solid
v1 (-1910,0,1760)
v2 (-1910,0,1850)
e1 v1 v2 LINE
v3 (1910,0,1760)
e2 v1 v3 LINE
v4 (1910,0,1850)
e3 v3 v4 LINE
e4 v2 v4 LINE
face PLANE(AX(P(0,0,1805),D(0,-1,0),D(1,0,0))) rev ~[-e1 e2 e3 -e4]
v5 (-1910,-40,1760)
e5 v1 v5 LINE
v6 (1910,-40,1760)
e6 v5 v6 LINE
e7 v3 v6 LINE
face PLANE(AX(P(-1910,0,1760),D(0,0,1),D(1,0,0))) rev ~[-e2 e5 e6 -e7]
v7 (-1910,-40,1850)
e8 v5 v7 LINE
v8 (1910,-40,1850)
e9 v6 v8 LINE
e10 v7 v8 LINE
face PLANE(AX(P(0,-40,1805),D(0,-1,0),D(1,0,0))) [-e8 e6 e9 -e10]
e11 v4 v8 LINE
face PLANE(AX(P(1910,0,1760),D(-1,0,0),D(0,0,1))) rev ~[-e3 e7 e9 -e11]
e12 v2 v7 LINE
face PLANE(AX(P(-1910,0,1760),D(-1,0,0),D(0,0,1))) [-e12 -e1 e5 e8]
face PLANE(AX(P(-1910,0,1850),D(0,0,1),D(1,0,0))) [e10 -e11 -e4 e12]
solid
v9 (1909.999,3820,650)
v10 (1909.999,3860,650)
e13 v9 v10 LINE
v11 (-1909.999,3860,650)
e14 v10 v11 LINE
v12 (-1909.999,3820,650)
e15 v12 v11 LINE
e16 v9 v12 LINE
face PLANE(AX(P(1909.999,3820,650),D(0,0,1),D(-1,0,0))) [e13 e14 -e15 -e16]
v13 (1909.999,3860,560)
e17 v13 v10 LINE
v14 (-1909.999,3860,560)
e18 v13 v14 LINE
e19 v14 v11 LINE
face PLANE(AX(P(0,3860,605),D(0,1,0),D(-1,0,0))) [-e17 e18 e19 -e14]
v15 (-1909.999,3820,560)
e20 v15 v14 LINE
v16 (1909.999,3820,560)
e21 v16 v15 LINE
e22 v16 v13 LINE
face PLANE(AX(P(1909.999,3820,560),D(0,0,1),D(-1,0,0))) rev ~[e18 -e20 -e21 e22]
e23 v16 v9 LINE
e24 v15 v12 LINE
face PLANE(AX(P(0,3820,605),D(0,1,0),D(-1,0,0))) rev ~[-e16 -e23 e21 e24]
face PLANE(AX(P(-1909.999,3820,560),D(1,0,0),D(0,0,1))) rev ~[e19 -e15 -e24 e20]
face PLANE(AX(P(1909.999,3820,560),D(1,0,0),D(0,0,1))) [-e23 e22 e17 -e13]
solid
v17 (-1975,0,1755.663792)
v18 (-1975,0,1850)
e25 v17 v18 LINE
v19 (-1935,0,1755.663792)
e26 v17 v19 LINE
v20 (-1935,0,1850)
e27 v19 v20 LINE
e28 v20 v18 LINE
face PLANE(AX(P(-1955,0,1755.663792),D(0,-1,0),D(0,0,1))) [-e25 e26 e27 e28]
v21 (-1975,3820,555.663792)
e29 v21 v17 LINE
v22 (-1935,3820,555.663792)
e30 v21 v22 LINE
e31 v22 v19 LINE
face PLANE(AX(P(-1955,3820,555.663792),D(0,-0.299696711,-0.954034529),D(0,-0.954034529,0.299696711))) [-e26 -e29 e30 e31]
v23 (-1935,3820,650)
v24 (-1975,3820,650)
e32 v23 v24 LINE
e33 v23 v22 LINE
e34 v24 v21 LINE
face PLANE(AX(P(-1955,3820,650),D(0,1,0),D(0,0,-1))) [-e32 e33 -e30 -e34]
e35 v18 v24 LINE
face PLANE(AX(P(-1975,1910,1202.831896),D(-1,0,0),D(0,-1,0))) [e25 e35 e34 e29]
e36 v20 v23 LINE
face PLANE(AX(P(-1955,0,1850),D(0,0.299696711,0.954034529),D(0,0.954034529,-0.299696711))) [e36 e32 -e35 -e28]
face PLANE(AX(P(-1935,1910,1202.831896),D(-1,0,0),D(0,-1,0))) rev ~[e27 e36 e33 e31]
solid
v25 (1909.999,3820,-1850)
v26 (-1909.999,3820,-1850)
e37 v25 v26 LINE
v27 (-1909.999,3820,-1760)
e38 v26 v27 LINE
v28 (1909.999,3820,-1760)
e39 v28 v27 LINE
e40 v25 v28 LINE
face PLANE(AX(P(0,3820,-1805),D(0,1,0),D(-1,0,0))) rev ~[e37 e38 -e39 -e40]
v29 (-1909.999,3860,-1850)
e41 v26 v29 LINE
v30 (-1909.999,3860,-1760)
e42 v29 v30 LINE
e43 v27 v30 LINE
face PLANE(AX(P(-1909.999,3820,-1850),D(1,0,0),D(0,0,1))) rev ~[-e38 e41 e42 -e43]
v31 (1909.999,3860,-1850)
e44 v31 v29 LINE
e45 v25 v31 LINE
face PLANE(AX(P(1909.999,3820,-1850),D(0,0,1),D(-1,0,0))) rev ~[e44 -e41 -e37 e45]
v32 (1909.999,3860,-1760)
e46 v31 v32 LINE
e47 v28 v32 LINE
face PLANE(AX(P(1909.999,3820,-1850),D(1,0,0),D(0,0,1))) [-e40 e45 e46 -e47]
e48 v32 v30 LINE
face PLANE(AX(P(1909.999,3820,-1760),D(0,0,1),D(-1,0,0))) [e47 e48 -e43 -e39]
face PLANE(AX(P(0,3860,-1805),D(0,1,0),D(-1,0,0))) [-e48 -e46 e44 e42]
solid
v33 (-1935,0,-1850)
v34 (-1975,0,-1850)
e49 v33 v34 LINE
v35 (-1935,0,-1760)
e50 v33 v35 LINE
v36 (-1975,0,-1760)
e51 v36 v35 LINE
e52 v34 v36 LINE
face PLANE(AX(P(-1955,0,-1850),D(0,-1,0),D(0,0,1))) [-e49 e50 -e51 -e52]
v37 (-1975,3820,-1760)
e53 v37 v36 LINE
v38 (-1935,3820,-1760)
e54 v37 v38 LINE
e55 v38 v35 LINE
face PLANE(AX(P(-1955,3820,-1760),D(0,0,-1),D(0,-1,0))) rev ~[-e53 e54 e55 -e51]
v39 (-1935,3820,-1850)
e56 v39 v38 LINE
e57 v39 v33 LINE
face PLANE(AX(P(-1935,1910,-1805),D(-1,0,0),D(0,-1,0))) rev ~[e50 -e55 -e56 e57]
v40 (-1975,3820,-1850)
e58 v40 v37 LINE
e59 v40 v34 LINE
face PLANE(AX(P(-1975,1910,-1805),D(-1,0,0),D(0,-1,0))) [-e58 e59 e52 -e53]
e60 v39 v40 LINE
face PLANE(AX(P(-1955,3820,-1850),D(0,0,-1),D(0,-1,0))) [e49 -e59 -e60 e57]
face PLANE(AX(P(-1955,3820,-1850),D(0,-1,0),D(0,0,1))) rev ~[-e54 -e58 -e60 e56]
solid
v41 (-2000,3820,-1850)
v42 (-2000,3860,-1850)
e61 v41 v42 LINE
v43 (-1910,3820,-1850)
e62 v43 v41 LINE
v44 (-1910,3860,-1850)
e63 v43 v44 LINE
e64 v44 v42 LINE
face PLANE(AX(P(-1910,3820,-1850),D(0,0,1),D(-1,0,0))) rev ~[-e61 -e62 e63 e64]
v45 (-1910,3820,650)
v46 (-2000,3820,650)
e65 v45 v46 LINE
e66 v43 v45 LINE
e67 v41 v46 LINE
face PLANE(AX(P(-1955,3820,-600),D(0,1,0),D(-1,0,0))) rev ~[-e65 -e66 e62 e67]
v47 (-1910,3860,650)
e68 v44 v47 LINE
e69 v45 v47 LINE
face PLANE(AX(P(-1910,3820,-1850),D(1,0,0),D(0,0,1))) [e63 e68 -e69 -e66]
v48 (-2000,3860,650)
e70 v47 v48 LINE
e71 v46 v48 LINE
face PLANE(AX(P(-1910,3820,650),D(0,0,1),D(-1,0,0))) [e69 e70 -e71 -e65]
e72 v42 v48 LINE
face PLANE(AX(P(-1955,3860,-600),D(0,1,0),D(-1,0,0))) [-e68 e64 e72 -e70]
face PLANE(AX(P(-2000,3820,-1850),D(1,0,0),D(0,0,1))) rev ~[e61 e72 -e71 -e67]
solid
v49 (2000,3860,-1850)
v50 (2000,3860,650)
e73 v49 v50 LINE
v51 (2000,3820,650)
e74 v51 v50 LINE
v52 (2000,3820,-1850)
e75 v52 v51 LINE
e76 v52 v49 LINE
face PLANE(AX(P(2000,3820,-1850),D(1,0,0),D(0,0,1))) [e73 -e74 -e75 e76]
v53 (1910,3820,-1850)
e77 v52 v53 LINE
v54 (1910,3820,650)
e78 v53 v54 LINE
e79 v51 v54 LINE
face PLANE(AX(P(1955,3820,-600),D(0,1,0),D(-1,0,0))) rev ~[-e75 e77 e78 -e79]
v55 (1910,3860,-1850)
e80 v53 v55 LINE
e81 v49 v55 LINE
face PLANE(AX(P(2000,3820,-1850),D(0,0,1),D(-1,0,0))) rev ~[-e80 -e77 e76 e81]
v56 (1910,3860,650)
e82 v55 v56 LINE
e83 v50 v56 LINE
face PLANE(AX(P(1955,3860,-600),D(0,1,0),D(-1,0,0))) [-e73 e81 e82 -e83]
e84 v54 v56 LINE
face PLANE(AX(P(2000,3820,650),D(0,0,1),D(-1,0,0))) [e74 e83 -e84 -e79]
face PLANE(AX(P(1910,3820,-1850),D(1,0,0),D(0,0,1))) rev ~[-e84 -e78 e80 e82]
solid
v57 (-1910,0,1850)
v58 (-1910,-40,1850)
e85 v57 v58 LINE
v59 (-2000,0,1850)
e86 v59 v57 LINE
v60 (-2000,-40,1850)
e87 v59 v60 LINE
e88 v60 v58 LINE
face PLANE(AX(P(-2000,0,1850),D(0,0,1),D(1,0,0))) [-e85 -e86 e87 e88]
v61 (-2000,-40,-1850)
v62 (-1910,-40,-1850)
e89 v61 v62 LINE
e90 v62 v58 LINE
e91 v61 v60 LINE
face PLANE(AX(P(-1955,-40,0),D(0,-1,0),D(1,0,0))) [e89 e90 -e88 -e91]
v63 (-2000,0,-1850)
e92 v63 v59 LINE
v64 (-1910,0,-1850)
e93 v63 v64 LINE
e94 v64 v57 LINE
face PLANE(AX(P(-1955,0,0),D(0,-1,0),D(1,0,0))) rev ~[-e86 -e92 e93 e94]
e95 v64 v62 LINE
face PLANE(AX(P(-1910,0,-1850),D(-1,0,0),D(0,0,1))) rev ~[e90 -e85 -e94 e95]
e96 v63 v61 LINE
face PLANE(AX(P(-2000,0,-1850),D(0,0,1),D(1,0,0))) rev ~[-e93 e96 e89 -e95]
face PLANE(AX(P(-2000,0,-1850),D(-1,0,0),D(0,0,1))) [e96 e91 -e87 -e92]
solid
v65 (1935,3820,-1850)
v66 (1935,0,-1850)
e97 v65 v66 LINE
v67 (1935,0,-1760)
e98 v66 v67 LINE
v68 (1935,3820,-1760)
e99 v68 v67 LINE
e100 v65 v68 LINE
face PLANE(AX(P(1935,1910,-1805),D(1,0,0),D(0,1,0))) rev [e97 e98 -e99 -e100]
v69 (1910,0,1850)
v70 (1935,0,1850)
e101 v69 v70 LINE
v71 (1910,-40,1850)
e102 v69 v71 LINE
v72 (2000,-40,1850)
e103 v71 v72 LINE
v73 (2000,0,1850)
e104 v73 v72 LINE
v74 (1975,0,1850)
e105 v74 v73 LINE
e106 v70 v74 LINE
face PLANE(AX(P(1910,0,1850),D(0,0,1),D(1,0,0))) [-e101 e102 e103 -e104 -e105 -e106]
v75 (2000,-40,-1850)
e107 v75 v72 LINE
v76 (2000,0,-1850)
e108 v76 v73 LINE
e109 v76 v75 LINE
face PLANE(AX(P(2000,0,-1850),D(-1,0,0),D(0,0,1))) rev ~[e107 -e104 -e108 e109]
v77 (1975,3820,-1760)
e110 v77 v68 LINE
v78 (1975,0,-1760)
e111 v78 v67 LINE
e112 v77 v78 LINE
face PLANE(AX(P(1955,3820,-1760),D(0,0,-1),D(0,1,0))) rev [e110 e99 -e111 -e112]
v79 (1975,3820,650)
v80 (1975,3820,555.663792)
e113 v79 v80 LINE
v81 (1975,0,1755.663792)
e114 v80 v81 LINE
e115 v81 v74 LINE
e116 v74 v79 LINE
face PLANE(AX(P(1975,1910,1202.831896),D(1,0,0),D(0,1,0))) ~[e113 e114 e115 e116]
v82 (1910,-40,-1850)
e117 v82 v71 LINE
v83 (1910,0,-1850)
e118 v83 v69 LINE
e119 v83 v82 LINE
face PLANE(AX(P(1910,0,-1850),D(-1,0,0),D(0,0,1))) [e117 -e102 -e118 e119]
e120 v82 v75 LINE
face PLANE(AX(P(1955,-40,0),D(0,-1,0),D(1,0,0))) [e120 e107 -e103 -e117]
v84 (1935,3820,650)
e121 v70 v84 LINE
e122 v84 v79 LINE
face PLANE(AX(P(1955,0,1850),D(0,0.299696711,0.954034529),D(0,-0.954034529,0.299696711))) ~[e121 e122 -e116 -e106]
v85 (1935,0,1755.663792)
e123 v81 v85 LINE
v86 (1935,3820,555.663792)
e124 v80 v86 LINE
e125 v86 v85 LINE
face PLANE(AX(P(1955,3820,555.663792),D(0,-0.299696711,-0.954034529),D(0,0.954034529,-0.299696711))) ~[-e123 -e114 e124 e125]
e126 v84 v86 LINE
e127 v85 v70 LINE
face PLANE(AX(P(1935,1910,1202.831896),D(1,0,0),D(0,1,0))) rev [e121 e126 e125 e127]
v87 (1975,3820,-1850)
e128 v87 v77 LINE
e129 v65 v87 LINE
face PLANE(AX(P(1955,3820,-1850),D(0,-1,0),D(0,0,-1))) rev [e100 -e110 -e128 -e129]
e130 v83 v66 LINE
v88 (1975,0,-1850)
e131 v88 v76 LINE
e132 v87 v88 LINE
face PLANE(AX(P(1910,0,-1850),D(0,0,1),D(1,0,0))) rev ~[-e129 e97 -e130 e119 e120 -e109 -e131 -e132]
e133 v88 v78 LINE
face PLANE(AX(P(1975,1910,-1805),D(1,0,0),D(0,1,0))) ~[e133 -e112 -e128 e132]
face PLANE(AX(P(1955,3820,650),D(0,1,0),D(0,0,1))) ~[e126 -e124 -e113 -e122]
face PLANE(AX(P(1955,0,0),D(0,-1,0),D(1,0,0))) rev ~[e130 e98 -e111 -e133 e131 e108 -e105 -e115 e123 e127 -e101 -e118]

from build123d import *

# Parameters (mm, degrees)
F1_W          = 90
F1_H          = 3700
F2_DEPTH      = 40
F3_W          = 3820
F3_H          = 90
F4_DEPTH      = 40
F8_DEPTH      = 20
F8_DEPTH_BACK = 20
F7_W          = 3820
F7_H          = 90
F10_W         = 90
F10_H         = 2500
F11_DEPTH     = 40
F10_W_2       = 3819.998
F10_H_2       = 90


with BuildPart() as f2:
    # F1 (on Front) → F2 (new body)
    with BuildSketch(Plane.XZ):
        with Locations((-1955, 0)):
            Rectangle(F1_W, F1_H)
    extrude(amount=F2_DEPTH)


with BuildPart() as f2b:
    # F1 (on Front) → F2, piece 2 (new body)
    with BuildSketch(Plane.XZ):
        with Locations((1955, 0)):
            Rectangle(F1_W, F1_H)
    extrude(amount=F2_DEPTH)

    # F9: F8, F8b across plane


with BuildPart() as f4:
    # F3 (on face) → F4 (new body)
    with BuildSketch(Plane.XZ):
        with Locations((0, 1805)):
            Rectangle(F3_W, F3_H)
    extrude(amount=F4_DEPTH)


with BuildPart() as f8:
    # F7 (on offset) → F8 (new body, two sides)
    with BuildSketch(Plane(origin=(-1955, 0, 0), x_dir=(0, -1, 0), z_dir=(-1, 0, 0))) as f8_sk:
        Polygon((0, 1755.6637917124), (0, 1850), (-3820, 650), (-3820, 555.6637917124), align=None)
    extrude(amount=F8_DEPTH)
    extrude(f8_sk.sketch, amount=-F8_DEPTH_BACK)


with BuildPart() as f8b:
    # F7 (on offset) → F8, piece 2 (new body, two sides)
    with BuildSketch(Plane(origin=(-1955, 0, 0), x_dir=(0, -1, 0), z_dir=(-1, 0, 0))) as f8_2_sk:
        with Locations((-1910, -1805)):
            Rectangle(F7_W, F7_H)
    extrude(amount=F8_DEPTH)
    extrude(f8_2_sk.sketch, amount=-F8_DEPTH_BACK)


with BuildPart() as f2b_1:
    add(f2b.part)
    add(f8.part.mirror(Plane.YZ))
    add(f8b.part.mirror(Plane.YZ))


with BuildPart() as f11:
    # F10 (on face) → F11 (new body)
    with BuildSketch(Plane(origin=(0, 3820, 0), x_dir=(-1, 0, 0), z_dir=(0, 1, 0))):
        with Locations((-1955, -600)):
            Rectangle(F10_W, F10_H)
    extrude(amount=F11_DEPTH)


with BuildPart() as f11b:
    # F10 (on face) → F11, piece 2 (new body)
    with BuildSketch(Plane(origin=(0, 3820, 0), x_dir=(-1, 0, 0), z_dir=(0, 1, 0))):
        with Locations((1955, -600)):
            Rectangle(F10_W, F10_H)
    extrude(amount=F11_DEPTH)


with BuildPart() as f11c:
    # F10 (on face) → F11, piece 3 (new body)
    with BuildSketch(Plane(origin=(0, 3820, 0), x_dir=(-1, 0, 0), z_dir=(0, 1, 0))):
        with Locations((0, 605)):
            Rectangle(F10_W_2, F10_H_2)
    extrude(amount=F11_DEPTH)


with BuildPart() as f11d:
    # F10 (on face) → F11, piece 4 (new body)
    with BuildSketch(Plane(origin=(0, 3820, 0), x_dir=(-1, 0, 0), z_dir=(0, 1, 0))):
        with Locations((0, -1805)):
            Rectangle(F10_W_2, F10_H_2)
    extrude(amount=F11_DEPTH)


solid = Compound([f2.part, f4.part, f8.part, f8b.part, f2b_1.part, f11.part, f11b.part, f11c.part, f11d.part])
